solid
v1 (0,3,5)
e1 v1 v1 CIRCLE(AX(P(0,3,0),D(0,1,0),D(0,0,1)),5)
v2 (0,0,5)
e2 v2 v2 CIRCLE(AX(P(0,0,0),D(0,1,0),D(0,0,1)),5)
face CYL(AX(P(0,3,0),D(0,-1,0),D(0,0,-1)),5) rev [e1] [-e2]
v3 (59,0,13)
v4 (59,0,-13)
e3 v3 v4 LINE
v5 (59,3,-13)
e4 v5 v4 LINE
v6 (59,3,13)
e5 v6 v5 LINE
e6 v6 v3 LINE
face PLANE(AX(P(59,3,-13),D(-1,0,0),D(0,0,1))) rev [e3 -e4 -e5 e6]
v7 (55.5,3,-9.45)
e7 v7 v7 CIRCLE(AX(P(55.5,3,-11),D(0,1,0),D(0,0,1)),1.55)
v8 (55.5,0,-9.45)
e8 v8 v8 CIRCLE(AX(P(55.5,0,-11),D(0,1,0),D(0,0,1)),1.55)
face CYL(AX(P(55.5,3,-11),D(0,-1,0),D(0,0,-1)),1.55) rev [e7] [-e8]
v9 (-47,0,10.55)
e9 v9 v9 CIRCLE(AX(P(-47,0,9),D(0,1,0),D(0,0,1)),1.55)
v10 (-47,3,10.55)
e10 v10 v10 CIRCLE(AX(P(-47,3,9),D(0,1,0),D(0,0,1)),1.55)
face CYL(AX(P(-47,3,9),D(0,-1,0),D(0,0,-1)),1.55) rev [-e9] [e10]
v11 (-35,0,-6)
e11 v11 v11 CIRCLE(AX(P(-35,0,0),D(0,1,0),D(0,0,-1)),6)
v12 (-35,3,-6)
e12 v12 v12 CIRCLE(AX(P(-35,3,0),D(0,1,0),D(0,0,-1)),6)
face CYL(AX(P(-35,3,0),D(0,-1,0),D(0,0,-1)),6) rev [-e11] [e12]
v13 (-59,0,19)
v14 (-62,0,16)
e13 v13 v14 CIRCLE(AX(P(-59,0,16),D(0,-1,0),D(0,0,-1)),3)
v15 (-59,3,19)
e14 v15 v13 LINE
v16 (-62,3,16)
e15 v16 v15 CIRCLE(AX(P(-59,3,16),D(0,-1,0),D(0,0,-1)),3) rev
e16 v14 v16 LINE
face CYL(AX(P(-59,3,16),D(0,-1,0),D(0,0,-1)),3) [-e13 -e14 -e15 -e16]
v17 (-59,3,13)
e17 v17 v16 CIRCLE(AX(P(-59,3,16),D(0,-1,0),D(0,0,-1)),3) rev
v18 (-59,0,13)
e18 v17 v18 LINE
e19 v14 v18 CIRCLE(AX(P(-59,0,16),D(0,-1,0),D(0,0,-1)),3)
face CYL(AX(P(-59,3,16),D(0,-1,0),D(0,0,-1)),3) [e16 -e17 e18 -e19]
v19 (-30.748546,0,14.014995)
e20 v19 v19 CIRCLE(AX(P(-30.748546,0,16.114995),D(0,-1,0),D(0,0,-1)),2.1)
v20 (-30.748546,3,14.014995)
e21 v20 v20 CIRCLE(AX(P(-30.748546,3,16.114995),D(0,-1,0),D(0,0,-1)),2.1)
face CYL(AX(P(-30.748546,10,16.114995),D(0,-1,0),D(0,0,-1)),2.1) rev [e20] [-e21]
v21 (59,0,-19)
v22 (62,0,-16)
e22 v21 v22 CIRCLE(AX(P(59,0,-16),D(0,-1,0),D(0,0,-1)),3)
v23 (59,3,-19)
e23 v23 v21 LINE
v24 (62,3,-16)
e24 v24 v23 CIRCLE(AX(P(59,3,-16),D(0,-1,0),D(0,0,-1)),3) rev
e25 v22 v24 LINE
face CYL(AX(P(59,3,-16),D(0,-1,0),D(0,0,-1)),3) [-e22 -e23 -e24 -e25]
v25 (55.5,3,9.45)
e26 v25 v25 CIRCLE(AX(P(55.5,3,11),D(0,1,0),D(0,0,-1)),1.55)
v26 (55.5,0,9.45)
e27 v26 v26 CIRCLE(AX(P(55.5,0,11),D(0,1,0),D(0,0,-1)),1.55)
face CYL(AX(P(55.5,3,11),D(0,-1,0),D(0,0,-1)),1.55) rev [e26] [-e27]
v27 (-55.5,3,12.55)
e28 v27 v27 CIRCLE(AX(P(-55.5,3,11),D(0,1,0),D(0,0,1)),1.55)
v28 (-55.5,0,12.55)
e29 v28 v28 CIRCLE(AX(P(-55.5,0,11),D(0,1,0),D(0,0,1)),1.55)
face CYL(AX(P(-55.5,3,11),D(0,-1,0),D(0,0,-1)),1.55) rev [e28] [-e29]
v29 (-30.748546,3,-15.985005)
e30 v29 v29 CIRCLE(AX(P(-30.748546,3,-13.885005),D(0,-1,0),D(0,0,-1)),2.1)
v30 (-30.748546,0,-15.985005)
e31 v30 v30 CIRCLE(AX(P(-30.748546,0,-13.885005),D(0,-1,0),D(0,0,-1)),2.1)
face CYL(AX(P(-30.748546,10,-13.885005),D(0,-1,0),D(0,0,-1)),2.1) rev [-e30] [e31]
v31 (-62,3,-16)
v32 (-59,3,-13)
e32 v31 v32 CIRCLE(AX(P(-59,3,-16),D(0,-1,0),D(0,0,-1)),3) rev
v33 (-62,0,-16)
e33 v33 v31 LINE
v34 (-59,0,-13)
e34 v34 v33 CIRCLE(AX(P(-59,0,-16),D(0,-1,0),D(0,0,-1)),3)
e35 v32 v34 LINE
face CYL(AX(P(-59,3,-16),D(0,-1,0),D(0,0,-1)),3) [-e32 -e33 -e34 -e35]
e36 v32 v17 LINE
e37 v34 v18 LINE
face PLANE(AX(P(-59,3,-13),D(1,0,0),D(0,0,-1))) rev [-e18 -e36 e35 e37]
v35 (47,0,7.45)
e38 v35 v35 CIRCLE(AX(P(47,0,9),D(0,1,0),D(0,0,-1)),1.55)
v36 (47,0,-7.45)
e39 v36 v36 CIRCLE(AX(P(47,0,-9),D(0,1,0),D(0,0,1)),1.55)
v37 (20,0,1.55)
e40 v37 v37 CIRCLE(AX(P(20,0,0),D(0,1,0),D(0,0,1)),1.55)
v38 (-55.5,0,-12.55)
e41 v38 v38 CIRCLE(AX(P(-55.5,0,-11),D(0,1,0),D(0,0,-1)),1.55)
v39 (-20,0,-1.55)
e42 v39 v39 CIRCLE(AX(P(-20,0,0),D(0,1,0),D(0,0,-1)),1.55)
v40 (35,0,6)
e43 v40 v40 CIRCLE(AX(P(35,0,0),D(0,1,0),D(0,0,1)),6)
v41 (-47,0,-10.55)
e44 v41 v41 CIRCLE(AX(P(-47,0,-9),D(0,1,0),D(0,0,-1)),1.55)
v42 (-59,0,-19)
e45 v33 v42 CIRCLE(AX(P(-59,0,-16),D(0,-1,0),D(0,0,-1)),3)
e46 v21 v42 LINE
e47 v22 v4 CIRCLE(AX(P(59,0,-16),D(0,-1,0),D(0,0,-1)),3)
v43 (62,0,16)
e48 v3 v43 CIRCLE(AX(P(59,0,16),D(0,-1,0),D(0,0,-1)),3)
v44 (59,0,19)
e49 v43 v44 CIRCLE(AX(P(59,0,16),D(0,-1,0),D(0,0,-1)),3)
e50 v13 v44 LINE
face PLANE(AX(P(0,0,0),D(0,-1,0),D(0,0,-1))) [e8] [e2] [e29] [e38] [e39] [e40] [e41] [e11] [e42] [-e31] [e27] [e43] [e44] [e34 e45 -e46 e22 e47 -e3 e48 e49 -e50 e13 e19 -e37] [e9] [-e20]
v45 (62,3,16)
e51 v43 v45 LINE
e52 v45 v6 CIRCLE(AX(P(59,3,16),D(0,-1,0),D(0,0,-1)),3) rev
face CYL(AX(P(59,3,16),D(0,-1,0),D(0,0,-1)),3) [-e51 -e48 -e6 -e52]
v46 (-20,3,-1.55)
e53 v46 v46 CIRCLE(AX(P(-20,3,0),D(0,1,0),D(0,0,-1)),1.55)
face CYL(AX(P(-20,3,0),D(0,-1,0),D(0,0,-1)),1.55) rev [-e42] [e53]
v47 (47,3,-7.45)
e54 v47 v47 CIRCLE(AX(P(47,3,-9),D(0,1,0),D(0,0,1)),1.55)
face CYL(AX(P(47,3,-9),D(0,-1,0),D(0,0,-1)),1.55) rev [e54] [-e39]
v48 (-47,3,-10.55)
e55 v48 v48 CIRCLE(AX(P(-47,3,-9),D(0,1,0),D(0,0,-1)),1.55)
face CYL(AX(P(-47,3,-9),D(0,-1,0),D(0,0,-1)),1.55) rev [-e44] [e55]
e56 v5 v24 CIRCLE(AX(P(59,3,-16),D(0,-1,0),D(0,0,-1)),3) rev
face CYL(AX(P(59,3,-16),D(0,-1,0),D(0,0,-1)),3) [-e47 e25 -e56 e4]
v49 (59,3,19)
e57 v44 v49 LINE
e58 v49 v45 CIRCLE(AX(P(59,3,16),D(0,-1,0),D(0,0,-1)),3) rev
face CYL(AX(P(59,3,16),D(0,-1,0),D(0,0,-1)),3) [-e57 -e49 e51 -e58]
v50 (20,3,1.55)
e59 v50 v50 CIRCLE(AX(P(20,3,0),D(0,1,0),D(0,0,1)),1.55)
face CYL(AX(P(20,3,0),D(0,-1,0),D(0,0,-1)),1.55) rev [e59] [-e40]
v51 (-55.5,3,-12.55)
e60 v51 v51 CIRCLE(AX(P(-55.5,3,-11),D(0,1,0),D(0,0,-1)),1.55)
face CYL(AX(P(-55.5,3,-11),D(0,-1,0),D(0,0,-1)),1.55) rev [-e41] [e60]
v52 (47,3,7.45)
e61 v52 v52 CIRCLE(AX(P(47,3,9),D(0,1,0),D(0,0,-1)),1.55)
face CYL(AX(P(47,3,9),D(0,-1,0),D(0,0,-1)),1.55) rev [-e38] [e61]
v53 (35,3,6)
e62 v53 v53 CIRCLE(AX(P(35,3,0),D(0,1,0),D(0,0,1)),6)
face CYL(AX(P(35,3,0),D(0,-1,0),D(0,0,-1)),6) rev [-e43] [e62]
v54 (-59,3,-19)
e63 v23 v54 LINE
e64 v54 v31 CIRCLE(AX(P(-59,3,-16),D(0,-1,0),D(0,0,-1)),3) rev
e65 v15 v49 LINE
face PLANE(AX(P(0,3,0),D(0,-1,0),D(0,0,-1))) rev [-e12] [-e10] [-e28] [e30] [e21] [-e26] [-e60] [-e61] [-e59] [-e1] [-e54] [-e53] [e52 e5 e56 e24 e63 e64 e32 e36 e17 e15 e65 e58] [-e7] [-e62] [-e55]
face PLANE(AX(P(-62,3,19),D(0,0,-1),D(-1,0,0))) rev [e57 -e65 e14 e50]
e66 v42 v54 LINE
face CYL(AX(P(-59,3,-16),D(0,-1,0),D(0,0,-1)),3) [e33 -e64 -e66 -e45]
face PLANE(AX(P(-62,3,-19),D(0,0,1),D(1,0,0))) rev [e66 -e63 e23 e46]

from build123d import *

# Parameters (mm, degrees)
SKETCH1_R           = 1.55
SKETCH1_R_2         = 5
SKETCH1_R_3         = 6
BOSS_EXTRUDE1_DEPTH = 3
FILLET1_R           = 3
SKETCH_3_R          = 2.1
CUT_EXTRUDE_1_DEPTH = 10


with BuildPart() as part:
    # Sketch1 → Boss-Extrude1 (new body)
    with BuildSketch(Plane(origin=(0, 0, 0), x_dir=(1, 0, 0), z_dir=(0, 1, 0))):
        Polygon((-62, 19), (62, 19), (62, 13), (59, 13), (59, -13), (62, -13), (62, -19), (-62, -19), (-62, -13), (-59, -13), (-59, 13), (-62, 13), align=None)
        with Locations(Location((55.5, 11, 0), (0, 0, 270))):
            Circle(SKETCH1_R, mode=Mode.SUBTRACT)
        with Locations(Location((-55.5, 11, 0), (0, 0, 90))):
            Circle(SKETCH1_R, mode=Mode.SUBTRACT)
        with Locations(Location((-55.5, -11, 0), (0, 0, 270))):
            Circle(SKETCH1_R, mode=Mode.SUBTRACT)
        with Locations(Location((55.5, -11, 0), (0, 0, 90))):
            Circle(SKETCH1_R, mode=Mode.SUBTRACT)
        with Locations(Location((0, 0, 0), (0, 0, 270))):
            Circle(SKETCH1_R_2, mode=Mode.SUBTRACT)
        with Locations(Location((20, 0, 0), (0, 0, 270))):
            Circle(SKETCH1_R, mode=Mode.SUBTRACT)
        with Locations(Location((-20, 0, 0), (0, 0, 90))):
            Circle(SKETCH1_R, mode=Mode.SUBTRACT)
        with Locations(Location((35, 0, 0), (0, 0, 270))):
            Circle(SKETCH1_R_3, mode=Mode.SUBTRACT)
        with Locations(Location((-35, 0, 0), (0, 0, 90))):
            Circle(SKETCH1_R_3, mode=Mode.SUBTRACT)
        with Locations(Location((47, 9, 0), (0, 0, 270))):
            Circle(SKETCH1_R, mode=Mode.SUBTRACT)
        with Locations(Location((47, -9, 0), (0, 0, 90))):
            Circle(SKETCH1_R, mode=Mode.SUBTRACT)
        with Locations(Location((-47, -9, 0), (0, 0, 270))):
            Circle(SKETCH1_R, mode=Mode.SUBTRACT)
        with Locations(Location((-47, 9, 0), (0, 0, 90))):
            Circle(SKETCH1_R, mode=Mode.SUBTRACT)
    extrude(amount=BOSS_EXTRUDE1_DEPTH)

    # Fillet1
    fillet1_edges = [part.edges().sort_by_distance(p)[0] for p in [
        (-62, 1.5, -19),
        (-62, 1.5, -13),
        (-62, 1.5, 13),
        (-62, 1.5, 19),
        (62, 1.5, 19),
        (62, 1.5, 13),
        (62, 1.5, -13),
        (62, 1.5, -19),
    ]]
    fillet(fillet1_edges, radius=FILLET1_R - 0.0001)  # a hair under: the kernel refuses the full size

    # 草图3 → 切除-拉伸1 (cut)
    with BuildSketch(Plane.XZ):
        with Locations(Location((-30.748546153, -13.88500521, 0), (0, 0, 270))):
            Circle(SKETCH_3_R)
        with Locations(Location((-30.748546153, 16.11499479, 0), (0, 0, 270))):
            Circle(SKETCH_3_R)
    extrude(amount=-CUT_EXTRUDE_1_DEPTH, mode=Mode.SUBTRACT)


solid = part.part
